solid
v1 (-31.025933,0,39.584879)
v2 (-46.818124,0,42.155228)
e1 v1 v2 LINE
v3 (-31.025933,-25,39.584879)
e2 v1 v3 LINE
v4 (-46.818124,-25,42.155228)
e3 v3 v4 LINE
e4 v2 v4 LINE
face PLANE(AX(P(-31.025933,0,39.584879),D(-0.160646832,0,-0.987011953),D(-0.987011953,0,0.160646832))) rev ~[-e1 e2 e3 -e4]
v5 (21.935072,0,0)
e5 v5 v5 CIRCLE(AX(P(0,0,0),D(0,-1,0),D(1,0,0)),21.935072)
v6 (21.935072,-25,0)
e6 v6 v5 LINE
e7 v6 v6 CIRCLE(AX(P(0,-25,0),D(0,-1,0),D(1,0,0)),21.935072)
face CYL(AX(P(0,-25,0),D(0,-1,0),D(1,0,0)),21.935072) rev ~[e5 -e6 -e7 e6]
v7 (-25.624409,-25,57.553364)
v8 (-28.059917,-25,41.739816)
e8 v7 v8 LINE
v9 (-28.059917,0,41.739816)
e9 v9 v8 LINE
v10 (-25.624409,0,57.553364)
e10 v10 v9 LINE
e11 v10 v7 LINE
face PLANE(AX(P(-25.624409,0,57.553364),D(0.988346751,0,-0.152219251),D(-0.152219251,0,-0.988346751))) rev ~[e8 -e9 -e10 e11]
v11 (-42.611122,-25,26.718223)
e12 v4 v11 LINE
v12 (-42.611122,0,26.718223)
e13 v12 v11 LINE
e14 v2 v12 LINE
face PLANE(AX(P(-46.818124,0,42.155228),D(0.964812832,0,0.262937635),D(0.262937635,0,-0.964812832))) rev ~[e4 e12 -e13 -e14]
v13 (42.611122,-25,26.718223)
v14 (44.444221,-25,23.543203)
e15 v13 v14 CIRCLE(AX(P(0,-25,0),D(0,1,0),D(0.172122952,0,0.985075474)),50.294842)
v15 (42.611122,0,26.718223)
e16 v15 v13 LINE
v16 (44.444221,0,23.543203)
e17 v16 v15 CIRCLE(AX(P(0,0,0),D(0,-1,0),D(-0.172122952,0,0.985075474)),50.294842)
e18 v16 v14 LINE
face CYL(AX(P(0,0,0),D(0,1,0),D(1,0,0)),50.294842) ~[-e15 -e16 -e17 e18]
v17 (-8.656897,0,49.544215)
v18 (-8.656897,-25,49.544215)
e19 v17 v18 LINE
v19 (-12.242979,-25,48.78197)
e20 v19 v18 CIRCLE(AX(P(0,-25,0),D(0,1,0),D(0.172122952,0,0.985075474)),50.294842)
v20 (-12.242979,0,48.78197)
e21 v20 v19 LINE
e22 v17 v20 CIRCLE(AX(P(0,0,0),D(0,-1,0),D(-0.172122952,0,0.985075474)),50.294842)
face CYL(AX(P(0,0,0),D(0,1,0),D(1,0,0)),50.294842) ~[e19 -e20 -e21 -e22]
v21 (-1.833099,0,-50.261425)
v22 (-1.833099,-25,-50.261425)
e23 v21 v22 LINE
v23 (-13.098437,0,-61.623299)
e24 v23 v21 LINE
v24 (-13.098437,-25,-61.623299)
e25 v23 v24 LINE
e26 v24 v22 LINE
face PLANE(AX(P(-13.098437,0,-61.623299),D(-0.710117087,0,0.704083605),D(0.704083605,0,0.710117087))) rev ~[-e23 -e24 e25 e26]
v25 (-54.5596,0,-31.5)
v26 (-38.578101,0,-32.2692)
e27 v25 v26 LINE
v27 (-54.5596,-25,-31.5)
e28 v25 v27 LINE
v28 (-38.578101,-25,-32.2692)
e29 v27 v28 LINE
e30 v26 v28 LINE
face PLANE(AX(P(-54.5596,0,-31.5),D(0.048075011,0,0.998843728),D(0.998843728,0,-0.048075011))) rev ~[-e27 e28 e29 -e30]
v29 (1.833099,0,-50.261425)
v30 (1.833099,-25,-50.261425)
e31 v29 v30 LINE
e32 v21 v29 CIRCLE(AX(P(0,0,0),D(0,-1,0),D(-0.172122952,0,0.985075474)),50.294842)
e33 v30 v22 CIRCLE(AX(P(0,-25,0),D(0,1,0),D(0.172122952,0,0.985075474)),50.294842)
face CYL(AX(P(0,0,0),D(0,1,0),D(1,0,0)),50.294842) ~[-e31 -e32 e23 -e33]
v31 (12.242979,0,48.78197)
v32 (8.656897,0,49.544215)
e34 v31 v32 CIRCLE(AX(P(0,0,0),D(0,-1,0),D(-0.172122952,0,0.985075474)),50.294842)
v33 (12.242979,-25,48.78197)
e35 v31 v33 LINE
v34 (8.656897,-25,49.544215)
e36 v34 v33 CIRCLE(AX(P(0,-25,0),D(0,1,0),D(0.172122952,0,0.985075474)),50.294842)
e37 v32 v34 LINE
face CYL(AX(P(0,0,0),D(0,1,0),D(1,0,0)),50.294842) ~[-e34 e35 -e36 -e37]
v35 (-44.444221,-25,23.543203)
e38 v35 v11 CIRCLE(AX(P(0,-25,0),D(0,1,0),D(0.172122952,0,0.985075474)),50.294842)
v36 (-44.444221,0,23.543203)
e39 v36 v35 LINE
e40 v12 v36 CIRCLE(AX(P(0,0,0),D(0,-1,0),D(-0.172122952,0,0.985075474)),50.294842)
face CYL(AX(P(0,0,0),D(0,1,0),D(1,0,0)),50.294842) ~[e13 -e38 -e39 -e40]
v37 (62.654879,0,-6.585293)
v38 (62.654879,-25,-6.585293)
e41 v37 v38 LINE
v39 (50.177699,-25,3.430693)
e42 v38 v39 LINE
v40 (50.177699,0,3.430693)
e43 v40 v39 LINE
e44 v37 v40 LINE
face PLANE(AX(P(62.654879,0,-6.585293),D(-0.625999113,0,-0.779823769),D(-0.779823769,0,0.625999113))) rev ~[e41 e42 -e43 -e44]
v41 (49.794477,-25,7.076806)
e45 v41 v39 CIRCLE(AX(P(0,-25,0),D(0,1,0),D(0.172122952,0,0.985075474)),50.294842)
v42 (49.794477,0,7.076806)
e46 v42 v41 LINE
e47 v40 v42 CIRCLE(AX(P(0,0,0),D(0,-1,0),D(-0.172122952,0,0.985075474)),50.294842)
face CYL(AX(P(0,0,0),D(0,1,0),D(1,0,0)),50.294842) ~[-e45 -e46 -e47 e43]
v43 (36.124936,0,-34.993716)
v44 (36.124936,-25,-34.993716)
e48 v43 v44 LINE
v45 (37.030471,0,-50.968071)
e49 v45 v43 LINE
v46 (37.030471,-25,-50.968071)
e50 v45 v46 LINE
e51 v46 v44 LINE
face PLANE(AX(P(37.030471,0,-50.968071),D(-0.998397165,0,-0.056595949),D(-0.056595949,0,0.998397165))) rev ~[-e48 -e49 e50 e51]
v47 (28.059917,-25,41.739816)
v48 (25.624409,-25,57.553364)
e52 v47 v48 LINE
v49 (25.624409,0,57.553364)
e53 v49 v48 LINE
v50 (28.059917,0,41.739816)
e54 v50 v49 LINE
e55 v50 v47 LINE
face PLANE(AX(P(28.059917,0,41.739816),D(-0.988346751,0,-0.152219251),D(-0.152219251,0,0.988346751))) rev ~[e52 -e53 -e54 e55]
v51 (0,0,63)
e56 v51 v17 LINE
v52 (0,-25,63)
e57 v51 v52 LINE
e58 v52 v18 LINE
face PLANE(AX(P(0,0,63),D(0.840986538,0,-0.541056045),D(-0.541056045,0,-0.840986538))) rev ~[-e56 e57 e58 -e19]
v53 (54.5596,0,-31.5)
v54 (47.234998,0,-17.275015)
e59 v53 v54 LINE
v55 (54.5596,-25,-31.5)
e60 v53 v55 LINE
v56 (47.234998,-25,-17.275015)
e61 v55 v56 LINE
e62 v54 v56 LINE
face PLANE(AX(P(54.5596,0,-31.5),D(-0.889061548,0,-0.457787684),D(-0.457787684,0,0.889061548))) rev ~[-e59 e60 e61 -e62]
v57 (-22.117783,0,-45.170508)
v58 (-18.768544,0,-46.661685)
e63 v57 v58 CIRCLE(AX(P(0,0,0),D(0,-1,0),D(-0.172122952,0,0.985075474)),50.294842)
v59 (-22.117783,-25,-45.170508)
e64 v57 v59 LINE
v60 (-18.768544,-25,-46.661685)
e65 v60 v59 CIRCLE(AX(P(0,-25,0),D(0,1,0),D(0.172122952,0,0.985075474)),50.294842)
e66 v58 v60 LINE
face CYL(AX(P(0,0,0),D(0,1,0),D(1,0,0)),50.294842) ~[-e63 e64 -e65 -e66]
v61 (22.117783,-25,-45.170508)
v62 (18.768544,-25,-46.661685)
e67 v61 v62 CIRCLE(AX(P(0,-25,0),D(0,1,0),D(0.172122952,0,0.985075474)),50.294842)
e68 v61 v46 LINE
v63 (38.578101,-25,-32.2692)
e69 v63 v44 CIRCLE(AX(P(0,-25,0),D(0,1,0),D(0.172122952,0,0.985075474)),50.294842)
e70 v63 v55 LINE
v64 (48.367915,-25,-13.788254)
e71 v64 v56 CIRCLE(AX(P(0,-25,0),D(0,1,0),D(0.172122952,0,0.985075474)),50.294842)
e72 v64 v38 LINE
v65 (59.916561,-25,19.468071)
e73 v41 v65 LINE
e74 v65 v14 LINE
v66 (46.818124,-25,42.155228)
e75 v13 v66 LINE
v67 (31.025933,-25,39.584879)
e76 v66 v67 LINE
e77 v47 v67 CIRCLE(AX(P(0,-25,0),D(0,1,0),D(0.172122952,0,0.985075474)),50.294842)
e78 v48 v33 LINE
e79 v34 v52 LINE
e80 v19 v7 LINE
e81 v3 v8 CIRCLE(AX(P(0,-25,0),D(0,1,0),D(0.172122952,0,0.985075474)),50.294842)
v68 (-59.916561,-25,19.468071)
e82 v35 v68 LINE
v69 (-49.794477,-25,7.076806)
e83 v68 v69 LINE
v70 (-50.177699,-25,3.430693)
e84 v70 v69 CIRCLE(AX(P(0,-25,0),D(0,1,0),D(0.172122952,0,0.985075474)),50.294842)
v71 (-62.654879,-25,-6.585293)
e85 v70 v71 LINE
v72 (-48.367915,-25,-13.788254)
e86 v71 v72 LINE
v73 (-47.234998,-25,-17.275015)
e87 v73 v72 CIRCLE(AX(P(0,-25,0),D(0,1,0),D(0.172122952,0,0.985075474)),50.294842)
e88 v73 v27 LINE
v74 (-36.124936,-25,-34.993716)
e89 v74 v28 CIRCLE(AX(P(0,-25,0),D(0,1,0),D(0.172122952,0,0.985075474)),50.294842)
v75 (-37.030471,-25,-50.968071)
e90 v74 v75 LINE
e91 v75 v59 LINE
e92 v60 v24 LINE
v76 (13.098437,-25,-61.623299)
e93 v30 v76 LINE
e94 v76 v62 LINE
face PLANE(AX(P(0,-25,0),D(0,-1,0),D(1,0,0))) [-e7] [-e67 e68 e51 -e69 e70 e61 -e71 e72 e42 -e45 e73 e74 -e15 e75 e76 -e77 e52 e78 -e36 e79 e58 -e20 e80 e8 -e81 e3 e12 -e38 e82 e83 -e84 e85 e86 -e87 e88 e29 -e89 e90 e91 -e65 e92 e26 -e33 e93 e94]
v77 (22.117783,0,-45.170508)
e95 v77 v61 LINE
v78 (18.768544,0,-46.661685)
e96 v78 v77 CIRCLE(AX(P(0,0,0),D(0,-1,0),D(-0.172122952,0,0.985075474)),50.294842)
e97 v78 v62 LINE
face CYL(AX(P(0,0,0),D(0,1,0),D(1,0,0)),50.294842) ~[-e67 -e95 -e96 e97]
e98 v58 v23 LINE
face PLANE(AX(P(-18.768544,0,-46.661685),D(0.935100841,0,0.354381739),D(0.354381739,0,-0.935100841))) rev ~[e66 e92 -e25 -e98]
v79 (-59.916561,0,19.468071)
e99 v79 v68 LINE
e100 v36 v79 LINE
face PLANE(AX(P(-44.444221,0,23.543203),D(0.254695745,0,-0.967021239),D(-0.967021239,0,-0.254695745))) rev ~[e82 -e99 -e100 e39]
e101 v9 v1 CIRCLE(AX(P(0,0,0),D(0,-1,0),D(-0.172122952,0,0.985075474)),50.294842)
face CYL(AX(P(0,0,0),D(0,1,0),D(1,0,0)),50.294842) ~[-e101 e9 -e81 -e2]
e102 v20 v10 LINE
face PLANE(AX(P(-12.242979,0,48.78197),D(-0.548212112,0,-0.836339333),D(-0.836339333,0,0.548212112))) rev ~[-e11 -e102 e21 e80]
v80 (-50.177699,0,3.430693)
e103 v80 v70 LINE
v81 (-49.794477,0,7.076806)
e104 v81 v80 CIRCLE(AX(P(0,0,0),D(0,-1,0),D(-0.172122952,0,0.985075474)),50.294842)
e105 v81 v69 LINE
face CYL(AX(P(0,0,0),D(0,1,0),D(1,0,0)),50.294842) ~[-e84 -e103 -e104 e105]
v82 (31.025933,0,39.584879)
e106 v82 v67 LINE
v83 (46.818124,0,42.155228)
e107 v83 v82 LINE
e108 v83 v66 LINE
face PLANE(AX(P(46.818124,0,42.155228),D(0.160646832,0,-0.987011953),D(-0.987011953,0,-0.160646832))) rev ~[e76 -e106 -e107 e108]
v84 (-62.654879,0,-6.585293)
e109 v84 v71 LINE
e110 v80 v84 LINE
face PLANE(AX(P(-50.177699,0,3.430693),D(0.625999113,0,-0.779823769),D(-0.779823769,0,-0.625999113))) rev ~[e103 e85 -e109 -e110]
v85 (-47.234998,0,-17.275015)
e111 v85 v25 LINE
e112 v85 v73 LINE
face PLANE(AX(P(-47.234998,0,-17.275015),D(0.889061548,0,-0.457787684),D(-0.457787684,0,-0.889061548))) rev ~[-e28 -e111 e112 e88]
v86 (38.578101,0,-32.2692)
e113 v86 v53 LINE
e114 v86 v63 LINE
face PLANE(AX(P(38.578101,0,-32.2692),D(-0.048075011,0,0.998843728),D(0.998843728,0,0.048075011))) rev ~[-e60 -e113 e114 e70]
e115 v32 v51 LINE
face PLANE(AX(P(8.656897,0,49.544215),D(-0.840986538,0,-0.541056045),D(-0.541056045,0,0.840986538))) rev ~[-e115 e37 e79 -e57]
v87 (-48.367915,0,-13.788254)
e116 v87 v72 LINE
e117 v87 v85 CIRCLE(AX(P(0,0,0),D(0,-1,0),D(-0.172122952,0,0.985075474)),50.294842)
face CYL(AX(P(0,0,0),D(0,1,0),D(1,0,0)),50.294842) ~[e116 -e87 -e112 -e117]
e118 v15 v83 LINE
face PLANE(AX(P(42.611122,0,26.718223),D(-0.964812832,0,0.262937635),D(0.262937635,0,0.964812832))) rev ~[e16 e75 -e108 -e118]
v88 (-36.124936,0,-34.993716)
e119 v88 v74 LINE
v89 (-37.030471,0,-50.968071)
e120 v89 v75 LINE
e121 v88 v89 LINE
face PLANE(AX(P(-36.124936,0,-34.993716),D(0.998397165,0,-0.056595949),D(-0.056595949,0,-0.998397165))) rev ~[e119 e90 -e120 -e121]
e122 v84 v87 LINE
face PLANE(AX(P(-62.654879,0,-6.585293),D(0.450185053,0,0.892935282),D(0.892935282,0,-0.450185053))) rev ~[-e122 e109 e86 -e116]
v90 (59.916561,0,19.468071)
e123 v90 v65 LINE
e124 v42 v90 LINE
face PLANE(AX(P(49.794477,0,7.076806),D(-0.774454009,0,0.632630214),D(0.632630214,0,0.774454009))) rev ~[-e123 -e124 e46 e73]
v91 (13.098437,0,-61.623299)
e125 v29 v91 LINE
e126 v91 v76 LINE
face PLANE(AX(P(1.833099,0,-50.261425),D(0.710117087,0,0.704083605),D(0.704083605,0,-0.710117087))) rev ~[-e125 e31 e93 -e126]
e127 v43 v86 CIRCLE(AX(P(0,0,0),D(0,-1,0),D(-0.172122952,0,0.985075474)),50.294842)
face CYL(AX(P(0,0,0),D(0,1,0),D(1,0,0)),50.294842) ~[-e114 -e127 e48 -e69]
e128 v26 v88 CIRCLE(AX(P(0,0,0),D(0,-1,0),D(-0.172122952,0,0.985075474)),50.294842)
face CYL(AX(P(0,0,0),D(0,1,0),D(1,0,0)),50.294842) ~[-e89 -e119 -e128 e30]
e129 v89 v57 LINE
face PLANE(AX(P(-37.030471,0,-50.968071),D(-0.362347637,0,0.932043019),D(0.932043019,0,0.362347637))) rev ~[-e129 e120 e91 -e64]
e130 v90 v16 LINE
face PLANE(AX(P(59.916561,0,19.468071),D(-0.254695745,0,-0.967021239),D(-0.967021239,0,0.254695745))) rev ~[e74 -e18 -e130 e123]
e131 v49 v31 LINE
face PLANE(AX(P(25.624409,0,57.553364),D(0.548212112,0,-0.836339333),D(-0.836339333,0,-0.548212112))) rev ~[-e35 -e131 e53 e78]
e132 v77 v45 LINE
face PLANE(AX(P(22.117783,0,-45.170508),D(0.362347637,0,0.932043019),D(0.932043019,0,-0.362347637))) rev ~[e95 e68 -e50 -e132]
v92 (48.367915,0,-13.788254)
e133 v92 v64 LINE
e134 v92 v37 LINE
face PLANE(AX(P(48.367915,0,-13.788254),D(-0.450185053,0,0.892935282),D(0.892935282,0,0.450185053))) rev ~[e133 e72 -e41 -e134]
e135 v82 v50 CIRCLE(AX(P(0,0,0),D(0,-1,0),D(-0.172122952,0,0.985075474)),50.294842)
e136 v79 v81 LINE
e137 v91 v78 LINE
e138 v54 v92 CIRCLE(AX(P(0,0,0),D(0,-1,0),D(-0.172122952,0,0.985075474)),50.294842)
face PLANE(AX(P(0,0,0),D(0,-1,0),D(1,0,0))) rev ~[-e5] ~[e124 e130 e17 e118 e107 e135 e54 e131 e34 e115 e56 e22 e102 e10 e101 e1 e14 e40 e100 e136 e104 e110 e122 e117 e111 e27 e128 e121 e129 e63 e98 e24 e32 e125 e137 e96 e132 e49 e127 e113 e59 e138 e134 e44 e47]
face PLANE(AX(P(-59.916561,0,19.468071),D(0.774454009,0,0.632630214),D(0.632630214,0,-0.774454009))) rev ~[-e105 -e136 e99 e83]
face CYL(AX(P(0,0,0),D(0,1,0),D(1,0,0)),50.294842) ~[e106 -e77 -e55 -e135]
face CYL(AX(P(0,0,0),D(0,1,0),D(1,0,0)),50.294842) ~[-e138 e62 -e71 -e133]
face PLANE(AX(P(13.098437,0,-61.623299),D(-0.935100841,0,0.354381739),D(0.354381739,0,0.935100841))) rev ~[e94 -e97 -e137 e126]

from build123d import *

# Parameters (mm, degrees)
F0_R            = 50.2948420816
F1_DEPTH        = 25
F2_R            = 21.9350719346
F3_DEPTH        = 25
F5_DEPTH        = 25
F5_COPIES_COUNT = 15


# Not quite as in the source:
# - a pattern or mirror of a feature is missing from the dataset's text; its kind, count and spacing are read off the source's solid


with BuildPart() as f1:
    # F0 (on Front) → F1 (new body)
    with BuildSketch(Plane.XZ):
        Circle(F0_R)
    extrude(amount=F1_DEPTH)

    # F2 (on face) → F3 (cut)
    with BuildSketch(Plane.XZ.offset(25)):
        Circle(F2_R)
    extrude(amount=-F3_DEPTH, mode=Mode.SUBTRACT)

    # F4 (on Front) → F5 (join)
    with BuildSketch(Plane.XZ):
        with BuildLine():
            Line((0, 63), (-8.656896714, 49.5442153969))
            ThreePointArc((-8.656896714, 49.5442153969), (0, 50.2948420816), (8.656896714, 49.5442153969))
            Line((8.656896714, 49.5442153969), (0, 63))
        make_face()
    f5 = extrude(amount=F5_DEPTH)

    # F5_copies: F5 ×15 about axis
    f5_copies_axis = Axis((0, 0, 0), (0, 1, 0))
    for i in range(1, F5_COPIES_COUNT):
        add(f5.rotate(f5_copies_axis, i * 360 / F5_COPIES_COUNT))


solid = f1.part
